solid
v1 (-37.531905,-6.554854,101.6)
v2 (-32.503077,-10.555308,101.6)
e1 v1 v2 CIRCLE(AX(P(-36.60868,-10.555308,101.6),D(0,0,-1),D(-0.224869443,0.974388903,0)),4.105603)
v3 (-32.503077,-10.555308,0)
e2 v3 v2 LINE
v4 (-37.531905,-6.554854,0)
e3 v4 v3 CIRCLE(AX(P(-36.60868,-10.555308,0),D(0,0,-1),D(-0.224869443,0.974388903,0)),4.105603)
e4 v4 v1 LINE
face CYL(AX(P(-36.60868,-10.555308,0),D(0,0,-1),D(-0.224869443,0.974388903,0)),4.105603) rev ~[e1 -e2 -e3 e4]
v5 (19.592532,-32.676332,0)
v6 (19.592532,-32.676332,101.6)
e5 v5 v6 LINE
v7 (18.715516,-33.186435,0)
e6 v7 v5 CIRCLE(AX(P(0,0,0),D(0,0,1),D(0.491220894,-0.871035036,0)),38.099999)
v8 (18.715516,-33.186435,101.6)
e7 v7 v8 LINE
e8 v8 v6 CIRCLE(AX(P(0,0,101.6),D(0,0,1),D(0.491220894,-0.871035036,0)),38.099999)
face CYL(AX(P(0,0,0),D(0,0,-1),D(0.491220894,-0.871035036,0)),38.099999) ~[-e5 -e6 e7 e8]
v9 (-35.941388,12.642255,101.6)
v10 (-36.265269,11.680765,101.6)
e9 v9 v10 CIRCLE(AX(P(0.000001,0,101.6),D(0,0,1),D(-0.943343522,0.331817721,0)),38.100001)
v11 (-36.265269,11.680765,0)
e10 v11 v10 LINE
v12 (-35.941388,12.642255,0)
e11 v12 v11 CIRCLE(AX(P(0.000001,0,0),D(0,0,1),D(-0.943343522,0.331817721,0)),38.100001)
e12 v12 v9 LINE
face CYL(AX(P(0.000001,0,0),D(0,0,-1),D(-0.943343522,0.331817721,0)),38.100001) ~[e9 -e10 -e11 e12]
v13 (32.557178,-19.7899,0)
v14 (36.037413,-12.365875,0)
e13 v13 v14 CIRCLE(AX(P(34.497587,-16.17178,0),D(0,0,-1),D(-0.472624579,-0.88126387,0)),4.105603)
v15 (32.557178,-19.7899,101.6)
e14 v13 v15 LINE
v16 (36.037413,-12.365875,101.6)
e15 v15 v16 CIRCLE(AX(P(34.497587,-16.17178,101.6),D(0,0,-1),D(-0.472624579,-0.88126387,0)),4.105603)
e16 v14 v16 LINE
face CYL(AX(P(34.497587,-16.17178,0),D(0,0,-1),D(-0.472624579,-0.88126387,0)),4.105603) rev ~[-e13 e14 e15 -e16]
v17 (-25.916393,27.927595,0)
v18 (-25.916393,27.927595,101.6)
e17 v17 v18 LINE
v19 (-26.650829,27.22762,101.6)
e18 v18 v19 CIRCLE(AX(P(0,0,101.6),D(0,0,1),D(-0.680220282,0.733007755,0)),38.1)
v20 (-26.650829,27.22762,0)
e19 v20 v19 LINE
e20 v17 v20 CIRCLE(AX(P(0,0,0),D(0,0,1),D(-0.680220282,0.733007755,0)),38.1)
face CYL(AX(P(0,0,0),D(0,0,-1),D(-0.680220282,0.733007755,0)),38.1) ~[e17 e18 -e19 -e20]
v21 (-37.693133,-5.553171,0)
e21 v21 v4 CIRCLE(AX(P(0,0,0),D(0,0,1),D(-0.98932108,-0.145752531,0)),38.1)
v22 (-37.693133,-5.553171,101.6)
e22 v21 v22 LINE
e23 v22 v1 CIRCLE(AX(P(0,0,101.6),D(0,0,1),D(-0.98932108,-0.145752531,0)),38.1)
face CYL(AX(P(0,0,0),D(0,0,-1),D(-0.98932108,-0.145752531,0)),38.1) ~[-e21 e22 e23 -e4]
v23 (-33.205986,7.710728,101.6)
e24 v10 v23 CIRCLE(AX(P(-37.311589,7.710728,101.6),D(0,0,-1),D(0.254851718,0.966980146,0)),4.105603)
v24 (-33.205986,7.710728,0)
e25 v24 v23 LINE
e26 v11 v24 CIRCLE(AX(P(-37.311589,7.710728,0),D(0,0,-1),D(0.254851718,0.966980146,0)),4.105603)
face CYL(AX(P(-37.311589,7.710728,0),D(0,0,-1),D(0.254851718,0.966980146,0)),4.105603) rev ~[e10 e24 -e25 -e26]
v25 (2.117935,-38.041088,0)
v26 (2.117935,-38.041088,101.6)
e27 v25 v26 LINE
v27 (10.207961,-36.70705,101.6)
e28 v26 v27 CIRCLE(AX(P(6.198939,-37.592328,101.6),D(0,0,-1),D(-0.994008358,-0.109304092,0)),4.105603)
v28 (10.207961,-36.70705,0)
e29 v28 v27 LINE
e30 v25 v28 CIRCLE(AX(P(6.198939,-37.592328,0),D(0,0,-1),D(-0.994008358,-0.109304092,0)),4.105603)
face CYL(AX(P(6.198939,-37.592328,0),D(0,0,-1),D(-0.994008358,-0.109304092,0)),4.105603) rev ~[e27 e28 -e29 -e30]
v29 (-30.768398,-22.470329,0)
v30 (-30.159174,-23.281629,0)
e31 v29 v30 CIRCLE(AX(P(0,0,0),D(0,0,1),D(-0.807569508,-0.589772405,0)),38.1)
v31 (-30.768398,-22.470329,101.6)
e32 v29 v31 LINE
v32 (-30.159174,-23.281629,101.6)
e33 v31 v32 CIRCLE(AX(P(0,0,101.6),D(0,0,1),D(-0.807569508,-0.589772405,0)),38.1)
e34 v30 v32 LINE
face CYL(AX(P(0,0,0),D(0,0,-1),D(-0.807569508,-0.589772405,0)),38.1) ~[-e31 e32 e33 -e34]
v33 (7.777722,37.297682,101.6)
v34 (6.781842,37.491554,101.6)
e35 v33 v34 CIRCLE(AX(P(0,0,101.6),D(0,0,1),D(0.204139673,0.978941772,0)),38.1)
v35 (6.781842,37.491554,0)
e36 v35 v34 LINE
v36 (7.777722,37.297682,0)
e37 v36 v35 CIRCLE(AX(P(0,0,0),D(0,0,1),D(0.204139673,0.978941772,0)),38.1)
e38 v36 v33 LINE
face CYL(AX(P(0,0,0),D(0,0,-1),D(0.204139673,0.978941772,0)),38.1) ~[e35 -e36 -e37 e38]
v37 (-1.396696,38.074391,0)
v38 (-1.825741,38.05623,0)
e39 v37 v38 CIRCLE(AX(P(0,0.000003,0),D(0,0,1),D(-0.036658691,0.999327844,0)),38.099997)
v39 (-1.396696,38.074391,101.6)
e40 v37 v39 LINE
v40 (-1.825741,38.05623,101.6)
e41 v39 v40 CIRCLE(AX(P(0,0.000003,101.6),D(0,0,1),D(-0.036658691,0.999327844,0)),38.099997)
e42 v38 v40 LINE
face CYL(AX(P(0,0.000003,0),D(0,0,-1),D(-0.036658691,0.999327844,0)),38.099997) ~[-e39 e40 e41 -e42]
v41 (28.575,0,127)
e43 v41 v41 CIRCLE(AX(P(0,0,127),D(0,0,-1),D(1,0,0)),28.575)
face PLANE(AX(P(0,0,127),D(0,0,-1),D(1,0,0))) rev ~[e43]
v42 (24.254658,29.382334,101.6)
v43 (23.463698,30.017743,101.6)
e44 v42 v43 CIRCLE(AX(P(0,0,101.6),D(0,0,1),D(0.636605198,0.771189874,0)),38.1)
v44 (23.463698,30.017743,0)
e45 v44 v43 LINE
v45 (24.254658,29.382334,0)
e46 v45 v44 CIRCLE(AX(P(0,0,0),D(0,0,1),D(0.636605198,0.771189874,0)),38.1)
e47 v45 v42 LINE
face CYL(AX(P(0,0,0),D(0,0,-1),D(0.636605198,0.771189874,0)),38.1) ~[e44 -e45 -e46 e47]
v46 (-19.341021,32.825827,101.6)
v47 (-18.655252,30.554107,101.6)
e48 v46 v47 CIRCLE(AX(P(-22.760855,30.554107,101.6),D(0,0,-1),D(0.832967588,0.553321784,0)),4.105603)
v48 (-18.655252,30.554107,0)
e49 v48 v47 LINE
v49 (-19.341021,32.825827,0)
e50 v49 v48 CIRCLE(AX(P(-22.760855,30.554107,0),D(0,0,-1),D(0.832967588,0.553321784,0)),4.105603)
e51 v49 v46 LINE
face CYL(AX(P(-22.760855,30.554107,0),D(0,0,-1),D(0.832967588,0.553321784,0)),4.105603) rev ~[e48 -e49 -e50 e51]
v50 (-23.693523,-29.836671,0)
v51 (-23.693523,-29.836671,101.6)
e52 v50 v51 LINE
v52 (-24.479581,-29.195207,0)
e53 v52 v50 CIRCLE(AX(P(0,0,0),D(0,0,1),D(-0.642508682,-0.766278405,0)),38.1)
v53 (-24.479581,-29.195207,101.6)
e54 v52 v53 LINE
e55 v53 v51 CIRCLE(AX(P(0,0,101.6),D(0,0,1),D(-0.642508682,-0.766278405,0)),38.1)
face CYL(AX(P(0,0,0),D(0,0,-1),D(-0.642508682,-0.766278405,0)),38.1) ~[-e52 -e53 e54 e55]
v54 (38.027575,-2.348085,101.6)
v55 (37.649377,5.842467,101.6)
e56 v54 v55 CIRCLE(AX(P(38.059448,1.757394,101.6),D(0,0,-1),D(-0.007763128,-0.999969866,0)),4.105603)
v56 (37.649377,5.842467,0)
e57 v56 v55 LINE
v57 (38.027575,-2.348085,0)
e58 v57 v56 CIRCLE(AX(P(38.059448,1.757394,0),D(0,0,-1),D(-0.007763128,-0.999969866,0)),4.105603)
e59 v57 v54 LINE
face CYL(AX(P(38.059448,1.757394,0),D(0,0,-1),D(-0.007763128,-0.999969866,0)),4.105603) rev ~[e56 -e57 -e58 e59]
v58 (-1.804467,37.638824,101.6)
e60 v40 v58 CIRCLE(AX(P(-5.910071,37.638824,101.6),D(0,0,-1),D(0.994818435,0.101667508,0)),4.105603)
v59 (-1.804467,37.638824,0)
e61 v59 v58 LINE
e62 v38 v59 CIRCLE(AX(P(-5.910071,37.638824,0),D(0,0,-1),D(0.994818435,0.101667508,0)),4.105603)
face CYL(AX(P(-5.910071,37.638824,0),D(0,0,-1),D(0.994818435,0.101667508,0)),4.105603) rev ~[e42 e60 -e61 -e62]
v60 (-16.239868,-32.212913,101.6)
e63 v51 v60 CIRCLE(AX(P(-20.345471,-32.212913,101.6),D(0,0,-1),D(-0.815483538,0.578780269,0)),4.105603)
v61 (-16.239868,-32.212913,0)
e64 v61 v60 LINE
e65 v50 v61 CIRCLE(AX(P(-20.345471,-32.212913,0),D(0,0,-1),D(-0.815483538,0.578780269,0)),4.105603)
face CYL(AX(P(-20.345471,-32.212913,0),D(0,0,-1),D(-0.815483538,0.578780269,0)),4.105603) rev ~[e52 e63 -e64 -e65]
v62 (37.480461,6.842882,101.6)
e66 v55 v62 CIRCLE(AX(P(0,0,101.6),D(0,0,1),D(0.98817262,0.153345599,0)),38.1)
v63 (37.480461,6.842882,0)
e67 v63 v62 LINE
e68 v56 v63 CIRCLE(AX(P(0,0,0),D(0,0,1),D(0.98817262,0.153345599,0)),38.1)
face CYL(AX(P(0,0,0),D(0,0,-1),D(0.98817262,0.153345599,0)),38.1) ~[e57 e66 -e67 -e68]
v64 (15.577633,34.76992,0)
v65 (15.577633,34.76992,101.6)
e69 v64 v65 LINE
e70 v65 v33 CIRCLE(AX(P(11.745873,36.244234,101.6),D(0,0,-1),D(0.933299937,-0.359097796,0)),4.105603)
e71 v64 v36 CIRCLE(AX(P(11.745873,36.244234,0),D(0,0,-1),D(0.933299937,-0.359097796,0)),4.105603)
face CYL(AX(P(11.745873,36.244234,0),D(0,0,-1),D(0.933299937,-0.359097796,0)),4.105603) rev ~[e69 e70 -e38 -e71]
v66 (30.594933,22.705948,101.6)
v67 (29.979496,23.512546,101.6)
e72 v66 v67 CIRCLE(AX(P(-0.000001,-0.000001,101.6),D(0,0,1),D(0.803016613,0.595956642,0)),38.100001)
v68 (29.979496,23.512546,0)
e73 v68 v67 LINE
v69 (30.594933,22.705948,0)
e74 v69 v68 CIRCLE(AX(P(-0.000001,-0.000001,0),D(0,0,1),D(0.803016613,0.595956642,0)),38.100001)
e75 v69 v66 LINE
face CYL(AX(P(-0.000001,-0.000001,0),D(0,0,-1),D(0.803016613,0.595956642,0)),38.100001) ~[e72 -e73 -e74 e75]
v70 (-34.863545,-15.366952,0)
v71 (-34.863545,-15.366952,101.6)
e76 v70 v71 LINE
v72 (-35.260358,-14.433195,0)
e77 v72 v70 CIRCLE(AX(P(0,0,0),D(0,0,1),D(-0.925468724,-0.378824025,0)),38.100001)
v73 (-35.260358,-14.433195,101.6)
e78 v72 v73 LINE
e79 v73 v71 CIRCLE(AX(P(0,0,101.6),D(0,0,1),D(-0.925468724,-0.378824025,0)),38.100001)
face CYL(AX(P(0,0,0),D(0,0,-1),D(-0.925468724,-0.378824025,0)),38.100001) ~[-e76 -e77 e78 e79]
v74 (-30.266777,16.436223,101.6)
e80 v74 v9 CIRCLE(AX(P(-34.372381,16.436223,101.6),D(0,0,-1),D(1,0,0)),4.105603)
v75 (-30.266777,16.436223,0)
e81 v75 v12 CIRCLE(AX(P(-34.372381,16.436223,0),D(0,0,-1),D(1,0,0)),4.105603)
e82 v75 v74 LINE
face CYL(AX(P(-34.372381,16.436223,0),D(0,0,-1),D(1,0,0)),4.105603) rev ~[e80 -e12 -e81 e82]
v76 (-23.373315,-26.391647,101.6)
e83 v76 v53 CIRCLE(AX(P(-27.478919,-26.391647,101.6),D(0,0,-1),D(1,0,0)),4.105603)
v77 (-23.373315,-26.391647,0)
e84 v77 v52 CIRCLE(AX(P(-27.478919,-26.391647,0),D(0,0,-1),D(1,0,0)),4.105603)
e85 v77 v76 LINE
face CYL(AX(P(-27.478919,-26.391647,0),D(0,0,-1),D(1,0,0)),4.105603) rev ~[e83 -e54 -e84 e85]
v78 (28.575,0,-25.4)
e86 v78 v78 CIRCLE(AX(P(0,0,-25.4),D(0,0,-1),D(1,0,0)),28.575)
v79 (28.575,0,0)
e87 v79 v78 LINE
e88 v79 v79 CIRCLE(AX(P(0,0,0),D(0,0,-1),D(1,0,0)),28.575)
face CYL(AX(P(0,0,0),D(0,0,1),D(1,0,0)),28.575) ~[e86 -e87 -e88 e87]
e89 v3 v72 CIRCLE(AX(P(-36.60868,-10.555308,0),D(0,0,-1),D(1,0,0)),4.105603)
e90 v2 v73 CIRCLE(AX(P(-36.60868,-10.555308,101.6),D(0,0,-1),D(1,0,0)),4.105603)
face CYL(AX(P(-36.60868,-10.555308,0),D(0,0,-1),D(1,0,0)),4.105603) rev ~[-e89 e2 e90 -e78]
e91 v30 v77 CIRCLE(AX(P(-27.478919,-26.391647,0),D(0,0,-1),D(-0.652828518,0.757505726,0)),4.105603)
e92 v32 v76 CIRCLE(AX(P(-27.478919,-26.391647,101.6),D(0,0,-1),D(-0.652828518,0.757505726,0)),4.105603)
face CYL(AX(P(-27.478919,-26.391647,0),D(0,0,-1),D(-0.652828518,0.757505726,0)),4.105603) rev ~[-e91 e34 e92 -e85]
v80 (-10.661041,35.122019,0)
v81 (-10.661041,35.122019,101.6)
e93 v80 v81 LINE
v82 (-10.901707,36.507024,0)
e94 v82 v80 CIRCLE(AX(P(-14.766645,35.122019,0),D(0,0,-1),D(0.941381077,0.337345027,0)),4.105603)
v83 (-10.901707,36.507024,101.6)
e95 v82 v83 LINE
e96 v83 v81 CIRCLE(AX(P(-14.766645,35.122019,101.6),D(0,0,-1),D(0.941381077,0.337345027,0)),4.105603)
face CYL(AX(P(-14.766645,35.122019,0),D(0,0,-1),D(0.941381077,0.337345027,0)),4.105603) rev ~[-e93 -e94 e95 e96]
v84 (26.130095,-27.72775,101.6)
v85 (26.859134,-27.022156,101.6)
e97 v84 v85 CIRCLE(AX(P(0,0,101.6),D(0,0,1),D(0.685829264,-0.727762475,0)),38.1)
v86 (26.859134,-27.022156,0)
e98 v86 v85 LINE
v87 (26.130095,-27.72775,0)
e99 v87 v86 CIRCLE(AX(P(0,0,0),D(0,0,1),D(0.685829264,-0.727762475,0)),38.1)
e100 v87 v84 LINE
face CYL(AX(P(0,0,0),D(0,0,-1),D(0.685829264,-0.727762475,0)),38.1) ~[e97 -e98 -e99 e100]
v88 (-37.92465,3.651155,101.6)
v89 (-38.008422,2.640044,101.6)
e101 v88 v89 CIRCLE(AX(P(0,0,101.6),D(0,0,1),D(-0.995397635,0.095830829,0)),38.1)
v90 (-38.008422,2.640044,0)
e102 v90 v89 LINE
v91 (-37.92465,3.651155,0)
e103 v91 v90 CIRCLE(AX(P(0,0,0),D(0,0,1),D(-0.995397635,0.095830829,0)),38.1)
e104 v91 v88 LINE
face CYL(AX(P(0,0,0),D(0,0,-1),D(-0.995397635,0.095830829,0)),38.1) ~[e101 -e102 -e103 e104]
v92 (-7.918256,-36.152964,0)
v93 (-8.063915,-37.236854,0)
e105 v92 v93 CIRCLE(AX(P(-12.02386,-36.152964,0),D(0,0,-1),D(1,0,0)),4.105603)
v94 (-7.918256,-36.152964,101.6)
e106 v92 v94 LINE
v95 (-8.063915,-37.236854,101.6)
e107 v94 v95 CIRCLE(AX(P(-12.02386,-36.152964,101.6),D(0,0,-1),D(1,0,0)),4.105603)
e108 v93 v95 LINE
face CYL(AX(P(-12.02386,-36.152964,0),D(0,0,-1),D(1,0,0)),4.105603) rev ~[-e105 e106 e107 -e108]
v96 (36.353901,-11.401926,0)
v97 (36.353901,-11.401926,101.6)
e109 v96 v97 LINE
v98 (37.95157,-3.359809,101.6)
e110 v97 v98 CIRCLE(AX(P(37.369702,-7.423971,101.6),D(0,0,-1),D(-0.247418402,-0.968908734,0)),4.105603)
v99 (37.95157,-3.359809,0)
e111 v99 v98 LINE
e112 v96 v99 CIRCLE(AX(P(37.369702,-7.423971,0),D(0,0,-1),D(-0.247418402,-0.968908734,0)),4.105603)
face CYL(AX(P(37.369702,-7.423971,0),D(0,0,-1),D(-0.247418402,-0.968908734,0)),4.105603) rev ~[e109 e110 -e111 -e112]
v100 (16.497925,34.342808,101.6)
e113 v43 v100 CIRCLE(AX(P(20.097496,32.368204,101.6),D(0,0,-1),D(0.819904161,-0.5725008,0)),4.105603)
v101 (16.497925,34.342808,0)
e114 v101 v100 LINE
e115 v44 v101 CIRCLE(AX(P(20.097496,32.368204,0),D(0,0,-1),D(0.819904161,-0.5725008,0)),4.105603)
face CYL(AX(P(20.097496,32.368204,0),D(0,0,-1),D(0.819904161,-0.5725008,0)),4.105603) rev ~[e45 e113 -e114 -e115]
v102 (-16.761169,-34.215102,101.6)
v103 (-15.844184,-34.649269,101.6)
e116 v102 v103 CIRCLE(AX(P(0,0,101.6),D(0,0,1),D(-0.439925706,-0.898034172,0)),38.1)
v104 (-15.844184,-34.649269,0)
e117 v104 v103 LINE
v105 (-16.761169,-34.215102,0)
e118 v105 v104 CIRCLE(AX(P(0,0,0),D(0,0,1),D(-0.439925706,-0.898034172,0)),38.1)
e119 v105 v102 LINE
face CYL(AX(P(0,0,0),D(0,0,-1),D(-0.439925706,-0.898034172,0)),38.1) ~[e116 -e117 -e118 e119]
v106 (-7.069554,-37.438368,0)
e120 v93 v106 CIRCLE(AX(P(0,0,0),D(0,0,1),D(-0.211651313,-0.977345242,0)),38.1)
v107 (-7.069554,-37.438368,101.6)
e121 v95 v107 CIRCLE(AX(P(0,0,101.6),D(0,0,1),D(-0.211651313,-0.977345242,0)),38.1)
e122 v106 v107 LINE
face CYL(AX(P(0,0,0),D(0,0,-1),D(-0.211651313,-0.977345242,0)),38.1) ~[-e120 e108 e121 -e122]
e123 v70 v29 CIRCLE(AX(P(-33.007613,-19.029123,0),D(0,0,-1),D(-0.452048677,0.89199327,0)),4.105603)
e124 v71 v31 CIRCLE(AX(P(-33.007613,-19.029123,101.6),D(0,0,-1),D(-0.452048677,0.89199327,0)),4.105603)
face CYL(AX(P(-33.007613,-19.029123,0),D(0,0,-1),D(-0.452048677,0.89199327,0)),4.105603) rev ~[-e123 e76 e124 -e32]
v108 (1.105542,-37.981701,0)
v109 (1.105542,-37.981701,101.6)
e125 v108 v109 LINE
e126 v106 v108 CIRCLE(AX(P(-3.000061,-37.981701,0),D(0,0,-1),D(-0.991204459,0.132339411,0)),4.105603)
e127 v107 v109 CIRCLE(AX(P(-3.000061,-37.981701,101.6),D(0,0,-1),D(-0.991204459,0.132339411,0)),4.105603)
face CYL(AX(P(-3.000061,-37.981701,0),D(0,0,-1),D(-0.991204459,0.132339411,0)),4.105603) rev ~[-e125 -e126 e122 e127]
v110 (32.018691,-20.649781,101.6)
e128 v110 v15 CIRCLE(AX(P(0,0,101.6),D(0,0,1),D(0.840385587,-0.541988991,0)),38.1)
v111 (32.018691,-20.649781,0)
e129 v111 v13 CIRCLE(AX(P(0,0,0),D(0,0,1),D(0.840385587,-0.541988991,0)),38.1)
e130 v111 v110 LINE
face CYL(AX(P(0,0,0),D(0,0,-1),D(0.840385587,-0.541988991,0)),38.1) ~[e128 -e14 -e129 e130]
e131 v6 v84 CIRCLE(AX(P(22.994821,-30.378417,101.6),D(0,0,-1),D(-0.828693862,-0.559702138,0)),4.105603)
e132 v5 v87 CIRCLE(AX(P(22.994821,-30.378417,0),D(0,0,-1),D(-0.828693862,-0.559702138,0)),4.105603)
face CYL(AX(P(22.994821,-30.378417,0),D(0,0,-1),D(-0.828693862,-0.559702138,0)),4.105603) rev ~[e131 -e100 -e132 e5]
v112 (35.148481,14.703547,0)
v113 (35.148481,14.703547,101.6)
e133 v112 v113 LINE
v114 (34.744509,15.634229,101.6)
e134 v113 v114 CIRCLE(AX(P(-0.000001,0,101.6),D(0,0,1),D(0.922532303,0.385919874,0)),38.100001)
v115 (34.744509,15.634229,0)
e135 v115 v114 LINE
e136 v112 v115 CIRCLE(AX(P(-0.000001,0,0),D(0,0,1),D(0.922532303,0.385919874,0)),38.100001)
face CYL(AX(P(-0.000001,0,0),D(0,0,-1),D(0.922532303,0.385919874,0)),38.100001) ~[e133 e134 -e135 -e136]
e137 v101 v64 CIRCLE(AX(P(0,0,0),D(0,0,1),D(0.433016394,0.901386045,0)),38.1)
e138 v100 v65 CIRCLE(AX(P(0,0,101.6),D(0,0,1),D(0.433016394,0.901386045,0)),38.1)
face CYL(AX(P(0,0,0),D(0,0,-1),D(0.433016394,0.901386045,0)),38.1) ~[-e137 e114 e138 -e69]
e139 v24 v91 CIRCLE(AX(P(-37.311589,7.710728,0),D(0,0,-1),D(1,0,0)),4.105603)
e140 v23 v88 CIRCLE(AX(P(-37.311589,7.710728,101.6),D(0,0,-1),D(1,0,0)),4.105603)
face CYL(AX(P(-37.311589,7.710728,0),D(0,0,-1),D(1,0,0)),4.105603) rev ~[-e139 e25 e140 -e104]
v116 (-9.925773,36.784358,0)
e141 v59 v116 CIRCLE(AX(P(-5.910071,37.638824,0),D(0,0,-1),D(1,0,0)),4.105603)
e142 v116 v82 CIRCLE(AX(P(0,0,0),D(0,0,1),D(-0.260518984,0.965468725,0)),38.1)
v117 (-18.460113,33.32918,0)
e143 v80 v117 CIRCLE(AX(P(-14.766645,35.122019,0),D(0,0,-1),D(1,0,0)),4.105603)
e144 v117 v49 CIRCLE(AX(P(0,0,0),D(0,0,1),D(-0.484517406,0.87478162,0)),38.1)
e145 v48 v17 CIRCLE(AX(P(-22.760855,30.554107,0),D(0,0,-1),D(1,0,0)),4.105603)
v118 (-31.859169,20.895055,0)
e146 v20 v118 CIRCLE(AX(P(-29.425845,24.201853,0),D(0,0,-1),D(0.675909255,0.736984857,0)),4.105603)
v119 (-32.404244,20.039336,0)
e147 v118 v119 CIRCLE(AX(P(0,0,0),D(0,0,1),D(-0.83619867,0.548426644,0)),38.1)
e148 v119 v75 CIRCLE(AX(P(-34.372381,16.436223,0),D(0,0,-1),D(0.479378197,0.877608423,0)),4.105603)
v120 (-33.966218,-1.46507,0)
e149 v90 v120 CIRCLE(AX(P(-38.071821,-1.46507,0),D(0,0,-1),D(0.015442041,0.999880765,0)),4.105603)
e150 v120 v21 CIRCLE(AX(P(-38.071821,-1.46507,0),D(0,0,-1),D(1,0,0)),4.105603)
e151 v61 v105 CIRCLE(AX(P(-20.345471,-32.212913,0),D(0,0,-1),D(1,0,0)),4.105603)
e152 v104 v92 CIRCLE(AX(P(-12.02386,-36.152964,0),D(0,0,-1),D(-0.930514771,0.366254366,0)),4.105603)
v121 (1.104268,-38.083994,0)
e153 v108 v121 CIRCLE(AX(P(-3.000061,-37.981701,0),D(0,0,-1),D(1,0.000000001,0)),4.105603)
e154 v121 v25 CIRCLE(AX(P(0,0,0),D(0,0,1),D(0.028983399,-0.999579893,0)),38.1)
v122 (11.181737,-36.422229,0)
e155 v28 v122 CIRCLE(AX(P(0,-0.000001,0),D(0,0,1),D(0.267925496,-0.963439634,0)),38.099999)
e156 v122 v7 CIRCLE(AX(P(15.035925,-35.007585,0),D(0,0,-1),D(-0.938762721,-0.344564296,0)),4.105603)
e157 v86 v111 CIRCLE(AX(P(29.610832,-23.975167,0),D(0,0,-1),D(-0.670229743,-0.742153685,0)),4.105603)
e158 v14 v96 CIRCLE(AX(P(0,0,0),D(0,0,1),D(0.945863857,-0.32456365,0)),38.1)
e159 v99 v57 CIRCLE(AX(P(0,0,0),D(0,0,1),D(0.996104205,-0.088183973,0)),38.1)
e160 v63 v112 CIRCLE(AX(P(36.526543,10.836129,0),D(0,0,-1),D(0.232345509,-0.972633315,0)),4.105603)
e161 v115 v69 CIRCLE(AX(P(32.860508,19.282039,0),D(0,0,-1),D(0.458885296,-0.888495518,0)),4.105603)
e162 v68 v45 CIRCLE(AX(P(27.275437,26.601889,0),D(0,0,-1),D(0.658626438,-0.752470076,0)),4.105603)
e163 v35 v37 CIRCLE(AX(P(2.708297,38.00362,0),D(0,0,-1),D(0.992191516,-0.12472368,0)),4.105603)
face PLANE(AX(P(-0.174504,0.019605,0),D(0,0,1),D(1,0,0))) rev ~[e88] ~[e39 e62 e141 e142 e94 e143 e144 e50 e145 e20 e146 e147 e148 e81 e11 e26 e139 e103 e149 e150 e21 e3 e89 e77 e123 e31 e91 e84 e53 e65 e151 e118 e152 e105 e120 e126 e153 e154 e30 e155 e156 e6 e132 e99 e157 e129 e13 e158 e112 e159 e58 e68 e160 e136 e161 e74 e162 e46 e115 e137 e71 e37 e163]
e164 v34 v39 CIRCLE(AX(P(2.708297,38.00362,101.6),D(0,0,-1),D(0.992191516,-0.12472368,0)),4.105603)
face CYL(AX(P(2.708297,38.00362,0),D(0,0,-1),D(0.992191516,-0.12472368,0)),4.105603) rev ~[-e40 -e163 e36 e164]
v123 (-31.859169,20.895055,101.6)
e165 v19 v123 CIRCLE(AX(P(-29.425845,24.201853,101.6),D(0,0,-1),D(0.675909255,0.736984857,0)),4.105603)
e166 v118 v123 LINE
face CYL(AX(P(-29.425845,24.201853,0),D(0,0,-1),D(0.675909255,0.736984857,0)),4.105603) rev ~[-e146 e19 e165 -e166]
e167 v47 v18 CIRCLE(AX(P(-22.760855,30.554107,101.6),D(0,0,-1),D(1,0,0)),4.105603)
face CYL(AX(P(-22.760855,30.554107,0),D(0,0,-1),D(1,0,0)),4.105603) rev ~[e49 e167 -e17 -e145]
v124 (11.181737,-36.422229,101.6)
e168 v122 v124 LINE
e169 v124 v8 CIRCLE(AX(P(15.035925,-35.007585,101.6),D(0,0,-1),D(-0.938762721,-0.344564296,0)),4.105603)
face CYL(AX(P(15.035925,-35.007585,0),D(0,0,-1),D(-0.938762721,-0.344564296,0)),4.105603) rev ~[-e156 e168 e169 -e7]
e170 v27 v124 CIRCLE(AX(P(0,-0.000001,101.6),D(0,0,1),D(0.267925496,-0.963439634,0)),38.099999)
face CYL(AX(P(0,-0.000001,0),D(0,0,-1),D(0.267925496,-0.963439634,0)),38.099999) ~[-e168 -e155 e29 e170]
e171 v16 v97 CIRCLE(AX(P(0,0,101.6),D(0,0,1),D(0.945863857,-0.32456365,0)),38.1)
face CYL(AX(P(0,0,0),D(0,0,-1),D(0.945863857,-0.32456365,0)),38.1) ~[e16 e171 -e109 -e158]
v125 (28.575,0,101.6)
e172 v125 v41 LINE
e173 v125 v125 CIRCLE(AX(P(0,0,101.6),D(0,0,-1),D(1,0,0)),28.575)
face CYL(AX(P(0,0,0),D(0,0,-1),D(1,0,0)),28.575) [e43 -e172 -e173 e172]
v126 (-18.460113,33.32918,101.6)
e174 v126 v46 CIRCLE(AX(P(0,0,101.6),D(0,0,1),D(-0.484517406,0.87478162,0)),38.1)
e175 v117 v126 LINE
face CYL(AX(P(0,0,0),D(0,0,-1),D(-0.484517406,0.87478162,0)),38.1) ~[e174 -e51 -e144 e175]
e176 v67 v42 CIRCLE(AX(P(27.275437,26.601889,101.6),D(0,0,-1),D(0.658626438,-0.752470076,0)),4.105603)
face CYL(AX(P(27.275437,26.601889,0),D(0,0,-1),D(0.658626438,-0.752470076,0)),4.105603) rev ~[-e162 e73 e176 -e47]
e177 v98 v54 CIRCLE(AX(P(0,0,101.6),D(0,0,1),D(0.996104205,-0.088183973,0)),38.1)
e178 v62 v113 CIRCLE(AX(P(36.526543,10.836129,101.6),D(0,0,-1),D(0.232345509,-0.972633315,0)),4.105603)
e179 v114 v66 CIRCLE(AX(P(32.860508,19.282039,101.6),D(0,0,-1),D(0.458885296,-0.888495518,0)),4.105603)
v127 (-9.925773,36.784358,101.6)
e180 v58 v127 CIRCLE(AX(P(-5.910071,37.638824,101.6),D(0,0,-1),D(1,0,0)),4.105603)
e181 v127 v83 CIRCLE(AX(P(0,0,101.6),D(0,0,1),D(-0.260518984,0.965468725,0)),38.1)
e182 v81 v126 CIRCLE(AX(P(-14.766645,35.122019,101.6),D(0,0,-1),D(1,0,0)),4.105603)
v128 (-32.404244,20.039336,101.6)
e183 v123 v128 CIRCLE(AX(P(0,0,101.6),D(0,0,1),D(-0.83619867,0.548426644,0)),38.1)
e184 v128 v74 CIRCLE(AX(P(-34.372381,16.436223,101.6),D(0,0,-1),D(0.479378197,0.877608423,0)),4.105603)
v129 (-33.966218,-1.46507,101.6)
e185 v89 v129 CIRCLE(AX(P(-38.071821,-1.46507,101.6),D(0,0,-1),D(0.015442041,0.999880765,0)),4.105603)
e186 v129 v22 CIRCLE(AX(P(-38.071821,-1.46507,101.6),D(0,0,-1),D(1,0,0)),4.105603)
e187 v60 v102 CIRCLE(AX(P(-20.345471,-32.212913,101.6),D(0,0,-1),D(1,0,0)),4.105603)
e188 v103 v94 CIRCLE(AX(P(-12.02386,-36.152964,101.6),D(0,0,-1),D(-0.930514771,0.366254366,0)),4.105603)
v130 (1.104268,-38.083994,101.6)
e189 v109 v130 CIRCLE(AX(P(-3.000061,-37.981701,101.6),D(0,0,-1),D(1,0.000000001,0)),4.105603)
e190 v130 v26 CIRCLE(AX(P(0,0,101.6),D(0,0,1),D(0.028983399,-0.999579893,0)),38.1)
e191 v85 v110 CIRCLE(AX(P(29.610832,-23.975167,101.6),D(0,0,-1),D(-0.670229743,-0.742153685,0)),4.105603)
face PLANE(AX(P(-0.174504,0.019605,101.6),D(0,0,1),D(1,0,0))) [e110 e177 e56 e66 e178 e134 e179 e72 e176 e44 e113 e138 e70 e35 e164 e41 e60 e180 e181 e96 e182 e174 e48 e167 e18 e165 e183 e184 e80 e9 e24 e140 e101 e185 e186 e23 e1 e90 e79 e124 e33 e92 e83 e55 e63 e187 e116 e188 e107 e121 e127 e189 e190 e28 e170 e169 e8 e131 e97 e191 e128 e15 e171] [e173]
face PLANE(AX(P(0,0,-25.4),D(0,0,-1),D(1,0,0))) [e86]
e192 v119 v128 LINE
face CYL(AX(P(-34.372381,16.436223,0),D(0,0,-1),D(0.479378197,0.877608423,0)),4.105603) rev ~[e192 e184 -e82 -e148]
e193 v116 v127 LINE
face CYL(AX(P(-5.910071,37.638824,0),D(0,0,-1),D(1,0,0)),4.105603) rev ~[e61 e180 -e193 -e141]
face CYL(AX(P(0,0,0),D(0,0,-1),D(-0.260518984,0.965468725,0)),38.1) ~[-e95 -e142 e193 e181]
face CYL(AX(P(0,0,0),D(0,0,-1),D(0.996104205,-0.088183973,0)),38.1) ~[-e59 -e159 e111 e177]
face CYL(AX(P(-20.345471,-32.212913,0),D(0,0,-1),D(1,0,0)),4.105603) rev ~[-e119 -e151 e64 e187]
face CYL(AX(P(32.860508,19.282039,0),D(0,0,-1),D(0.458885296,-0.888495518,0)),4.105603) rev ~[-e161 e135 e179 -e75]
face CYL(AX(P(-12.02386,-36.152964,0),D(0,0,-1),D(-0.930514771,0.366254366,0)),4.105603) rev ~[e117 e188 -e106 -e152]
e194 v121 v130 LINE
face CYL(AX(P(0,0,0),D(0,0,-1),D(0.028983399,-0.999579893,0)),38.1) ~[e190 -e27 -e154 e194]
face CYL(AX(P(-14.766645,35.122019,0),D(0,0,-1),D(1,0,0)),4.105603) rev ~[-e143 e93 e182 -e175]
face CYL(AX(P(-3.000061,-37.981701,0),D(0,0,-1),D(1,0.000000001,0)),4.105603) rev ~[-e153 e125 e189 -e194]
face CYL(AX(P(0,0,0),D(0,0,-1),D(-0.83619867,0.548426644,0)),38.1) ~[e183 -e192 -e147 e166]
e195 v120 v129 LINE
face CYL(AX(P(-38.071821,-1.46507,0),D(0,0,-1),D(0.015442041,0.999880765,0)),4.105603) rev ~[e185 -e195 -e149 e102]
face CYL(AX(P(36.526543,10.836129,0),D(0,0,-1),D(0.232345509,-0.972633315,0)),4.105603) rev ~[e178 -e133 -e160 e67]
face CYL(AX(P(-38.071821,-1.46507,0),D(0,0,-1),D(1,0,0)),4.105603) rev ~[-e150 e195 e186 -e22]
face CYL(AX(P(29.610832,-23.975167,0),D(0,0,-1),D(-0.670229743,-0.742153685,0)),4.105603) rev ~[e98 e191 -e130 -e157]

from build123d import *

# Parameters (mm, degrees)
F2_DEPTH      = 101.6
F3_R          = 28.575
F4_DEPTH      = 25.4
F4_DEPTH_BACK = 127


# Not quite as in the source:
# - a variable given as a bare number and used for a length is read in inches; the dataset says mm whatever the document's units were


with BuildPart() as f2:
    # F1 (on Top) → F2 (new body)
    with BuildSketch(Plane.XY):
        with BuildLine():
            ThreePointArc((38.0275754542, -2.3480854065), (33.9582141815, 1.5680199369), (37.6493768268, 5.8424673345))
            ThreePointArc((37.6493768268, 5.8424673345), (37.5682491535, 6.3432369925), (37.4804611085, 6.8428820754))
            ThreePointArc((37.4804611085, 6.8428820754), (32.5904927394, 9.6684424763), (35.1484807634, 14.703547192))
            ThreePointArc((35.1484807634, 14.703547192), (34.949592771, 15.1702328637), (34.7445086614, 15.6342290466))
            ThreePointArc((34.7445086614, 15.6342290466), (29.3195046315, 17.2042333476), (30.5949329549, 22.705948064))
            ThreePointArc((30.5949329549, 22.705948064), (30.2898995917, 23.1112955656), (29.9794962155, 23.5125457292))
            ThreePointArc((29.9794962155, 23.5125457292), (24.3362737456, 23.7353065516), (24.254658063, 29.3823341865))
            ThreePointArc((24.254658063, 29.3823341865), (23.861293108, 29.7026714491), (23.4636978498, 30.0177428068))
            ThreePointArc((23.4636978498, 30.0177428068), (17.9318179962, 28.8802510423), (16.4979246183, 34.3428083198))
            ThreePointArc((16.4979246183, 34.3428083198), (16.0392003661, 34.5594278254), (15.5776325681, 34.7699203849))
            ThreePointArc((15.5776325681, 34.7699203849), (10.4801540403, 32.3386049206), (7.7777215434, 37.2976815311))
            ThreePointArc((7.7777215434, 37.2976815311), (7.2804272356, 37.3979328208), (6.7818422008, 37.4915539337))
            ThreePointArc((6.7818422008, 37.4915539337), (2.4164549121, 33.9084022415), (-1.3966961475, 38.0743908667))
            ThreePointArc((-1.3966961475, 38.0743908667), (-1.611243941, 38.0659151074), (-1.8257405619, 38.0562303887))
            ThreePointArc((-1.8257405619, 38.0562303887), (-1.8097889216, 37.8477980327), (-1.8044671093, 37.638823919))
            ThreePointArc((-1.8044671093, 37.638823919), (-5.4804796414, 33.5557575077), (-9.9257732847, 36.7843584245))
            ThreePointArc((-9.9257732847, 36.7843584245), (-10.4146635829, 36.648939718), (-10.901707494, 36.5070236217))
            ThreePointArc((-10.901707494, 36.5070236217), (-10.7216553993, 35.8248982817), (-10.661041443, 35.1220187156))
            ThreePointArc((-10.661041443, 35.1220187156), (-13.8468450451, 31.1207754191), (-18.4601131844, 33.3291797262))
            ThreePointArc((-18.4601131844, 33.3291797262), (-18.9022425388, 33.0804357137), (-19.3410207665, 32.8258269616))
            ThreePointArc((-19.3410207665, 32.8258269616), (-18.8304314471, 31.7405924789), (-18.6552519207, 30.5541071359))
            ThreePointArc((-18.6552519207, 30.5541071359), (-21.3643249191, 26.6933193437), (-25.9163927322, 27.9275954524))
            ThreePointArc((-25.9163927322, 27.9275954524), (-26.2859410341, 27.580052646), (-26.6508291737, 27.2276202478))
            ThreePointArc((-26.6508291737, 27.2276202478), (-25.6675808238, 25.8545575842), (-25.3202410927, 24.2018526781))
            ThreePointArc((-25.3202410927, 24.2018526781), (-27.5730476059, 20.5380946086), (-31.8591693457, 20.8950551232))
            ThreePointArc((-31.8591693457, 20.8950551232), (-32.1345551797, 20.4690098296), (-32.4042439666, 20.0393356415))
            ThreePointArc((-32.4042439666, 20.0393356415), (-30.8413491085, 18.5309299599), (-30.266777295, 16.4362234724))
            ThreePointArc((-30.266777295, 16.4362234724), (-32.090467362, 13.0231821609), (-35.9413881732, 12.6422551859))
            ThreePointArc((-35.9413881732, 12.6422551859), (-36.1065291595, 12.1625882135), (-36.2652689185, 11.6807649693))
            ThreePointArc((-36.2652689185, 11.6807649693), (-34.0595315808, 10.2167411474), (-33.2059855622, 7.7107279494))
            ThreePointArc((-33.2059855622, 7.7107279494), (-34.633997298, 4.5984165422), (-37.9246499035, 3.6511545708))
            ThreePointArc((-37.9246499035, 3.6511545708), (-37.9699019004, 3.1458782044), (-38.0084223177, 2.6400441138))
            ThreePointArc((-38.0084223177, 2.6400441138), (-35.1463921507, 1.415528136), (-33.9662177648, -1.4650698011))
            ThreePointArc((-33.9662177648, -1.4650698011), (-35.0377873736, -4.231044916), (-37.6931331536, -5.5531714423))
            ThreePointArc((-37.6931331536, -5.5531714423), (-37.6158534696, -6.0545493438), (-37.5319049742, -6.554853851))
            ThreePointArc((-37.5319049742, -6.554853851), (-34.0527474172, -7.3423365778), (-32.5030767644, -10.5553082894))
            ThreePointArc((-32.5030767644, -10.5553082894), (-33.2626635907, -12.9344157776), (-35.2603583731, -14.4331953289))
            ThreePointArc((-35.2603583731, -14.4331953289), (-35.0650600987, -14.9013945747), (-34.8635452362, -15.3669519932))
            ThreePointArc((-34.8635452362, -15.3669519932), (-30.8586295725, -15.530858571), (-28.9020091826, -19.029122639))
            ThreePointArc((-28.9020091826, -19.029122639), (-29.3986442237, -20.9865001474), (-30.7683982573, -22.4703286287))
            ThreePointArc((-30.7683982573, -22.4703286287), (-30.4664867033, -22.878006643), (-30.1591738296, -23.2816286783))
            ThreePointArc((-30.1591738296, -23.2816286783), (-25.7683757069, -22.6593523381), (-23.373315365, -26.3916468007))
            ThreePointArc((-23.373315365, -26.3916468007), (-23.6598827933, -27.8986118146), (-24.4795807808, -29.1952072231))
            ThreePointArc((-24.4795807808, -29.1952072231), (-24.0886874142, -29.5185558363), (-23.6935234304, -29.8366711859))
            ThreePointArc((-23.6935234304, -29.8366711859), (-19.0984337687, -28.3012799336), (-16.2398679583, -32.2129134548))
            ThreePointArc((-16.2398679583, -32.2129134548), (-16.3723301811, -33.2473835979), (-16.7611693897, -34.2151019389))
            ThreePointArc((-16.7611693897, -34.2151019389), (-16.3041221659, -34.4352377718), (-15.844184429, -34.649268676))
            ThreePointArc((-15.844184429, -34.649268676), (-11.2586011252, -32.1193105722), (-7.9182563272, -36.1529638633))
            ThreePointArc((-7.9182563272, -36.1529638633), (-7.9548339389, -36.6997804834), (-8.0639150202, -37.2368537144))
            ThreePointArc((-8.0639150202, -37.2368537144), (-7.567405243, -37.3409209566), (-7.0695538613, -37.4383681295))
            ThreePointArc((-7.0695538613, -37.4383681295), (-2.7277955027, -33.8851355215), (1.1055420333, -37.9817012719))
            ThreePointArc((1.1055420333, -37.9817012719), (1.105223389, -38.0328515683), (1.1042675055, -38.083993925))
            ThreePointArc((1.1042675055, -38.083993925), (1.611243941, -38.0659151074), (2.1179347234, -38.0410876883))
            ThreePointArc((2.1179347234, -38.0410876883), (5.5309497632, -33.5414309717), (10.2079614225, -36.707050053))
            ThreePointArc((10.2079614225, -36.707050053), (10.6957973741, -36.5678809686), (11.1817370971, -36.4222288649))
            ThreePointArc((11.1817370971, -36.4222288649), (13.4156740687, -31.2352154819), (18.7155160648, -33.1864348556))
            ThreePointArc((18.7155160648, -33.1864348556), (19.1557221841, -32.9343029015), (19.592532238, -32.6763321152))
            ThreePointArc((19.592532238, -32.6763321152), (20.5169304634, -27.1048807648), (26.1300949689, -27.7277503039))
            ThreePointArc((26.1300949689, -27.7277503039), (26.4969634631, -27.377379846), (26.8591343834, -27.0221557277))
            ThreePointArc((26.8591343834, -27.0221557277), (26.4200095201, -21.3916360729), (32.018690847, -20.6497805423))
            ThreePointArc((32.018690847, -20.6497805423), (32.2907967999, -20.2216330208), (32.5571780061, -19.7899004616))
            ThreePointArc((32.5571780061, -19.7899004616), (30.780174702, -14.4291317214), (36.0374129719, -12.3658750718))
            ThreePointArc((36.0374129719, -12.3658750718), (36.1988655471, -11.8849540641), (36.3539005248, -11.4019260055))
            ThreePointArc((36.3539005248, -11.4019260055), (33.3427947854, -6.6239740954), (37.9515702047, -3.3598093687))
            ThreePointArc((37.9515702047, -3.3598093687), (37.9929406615, -2.8542003943), (38.0275754542, -2.3480854065))
        make_face()
    extrude(amount=F2_DEPTH)

    # F3 (on face) → F4 (join, two sides)
    with BuildSketch(Plane(origin=(0, 0, 0), x_dir=(1, 0, 0), z_dir=(0, 0, -1))) as f4_sk:
        Circle(F3_R)
    extrude(amount=F4_DEPTH)
    extrude(f4_sk.sketch, amount=-F4_DEPTH_BACK)


solid = f2.part
